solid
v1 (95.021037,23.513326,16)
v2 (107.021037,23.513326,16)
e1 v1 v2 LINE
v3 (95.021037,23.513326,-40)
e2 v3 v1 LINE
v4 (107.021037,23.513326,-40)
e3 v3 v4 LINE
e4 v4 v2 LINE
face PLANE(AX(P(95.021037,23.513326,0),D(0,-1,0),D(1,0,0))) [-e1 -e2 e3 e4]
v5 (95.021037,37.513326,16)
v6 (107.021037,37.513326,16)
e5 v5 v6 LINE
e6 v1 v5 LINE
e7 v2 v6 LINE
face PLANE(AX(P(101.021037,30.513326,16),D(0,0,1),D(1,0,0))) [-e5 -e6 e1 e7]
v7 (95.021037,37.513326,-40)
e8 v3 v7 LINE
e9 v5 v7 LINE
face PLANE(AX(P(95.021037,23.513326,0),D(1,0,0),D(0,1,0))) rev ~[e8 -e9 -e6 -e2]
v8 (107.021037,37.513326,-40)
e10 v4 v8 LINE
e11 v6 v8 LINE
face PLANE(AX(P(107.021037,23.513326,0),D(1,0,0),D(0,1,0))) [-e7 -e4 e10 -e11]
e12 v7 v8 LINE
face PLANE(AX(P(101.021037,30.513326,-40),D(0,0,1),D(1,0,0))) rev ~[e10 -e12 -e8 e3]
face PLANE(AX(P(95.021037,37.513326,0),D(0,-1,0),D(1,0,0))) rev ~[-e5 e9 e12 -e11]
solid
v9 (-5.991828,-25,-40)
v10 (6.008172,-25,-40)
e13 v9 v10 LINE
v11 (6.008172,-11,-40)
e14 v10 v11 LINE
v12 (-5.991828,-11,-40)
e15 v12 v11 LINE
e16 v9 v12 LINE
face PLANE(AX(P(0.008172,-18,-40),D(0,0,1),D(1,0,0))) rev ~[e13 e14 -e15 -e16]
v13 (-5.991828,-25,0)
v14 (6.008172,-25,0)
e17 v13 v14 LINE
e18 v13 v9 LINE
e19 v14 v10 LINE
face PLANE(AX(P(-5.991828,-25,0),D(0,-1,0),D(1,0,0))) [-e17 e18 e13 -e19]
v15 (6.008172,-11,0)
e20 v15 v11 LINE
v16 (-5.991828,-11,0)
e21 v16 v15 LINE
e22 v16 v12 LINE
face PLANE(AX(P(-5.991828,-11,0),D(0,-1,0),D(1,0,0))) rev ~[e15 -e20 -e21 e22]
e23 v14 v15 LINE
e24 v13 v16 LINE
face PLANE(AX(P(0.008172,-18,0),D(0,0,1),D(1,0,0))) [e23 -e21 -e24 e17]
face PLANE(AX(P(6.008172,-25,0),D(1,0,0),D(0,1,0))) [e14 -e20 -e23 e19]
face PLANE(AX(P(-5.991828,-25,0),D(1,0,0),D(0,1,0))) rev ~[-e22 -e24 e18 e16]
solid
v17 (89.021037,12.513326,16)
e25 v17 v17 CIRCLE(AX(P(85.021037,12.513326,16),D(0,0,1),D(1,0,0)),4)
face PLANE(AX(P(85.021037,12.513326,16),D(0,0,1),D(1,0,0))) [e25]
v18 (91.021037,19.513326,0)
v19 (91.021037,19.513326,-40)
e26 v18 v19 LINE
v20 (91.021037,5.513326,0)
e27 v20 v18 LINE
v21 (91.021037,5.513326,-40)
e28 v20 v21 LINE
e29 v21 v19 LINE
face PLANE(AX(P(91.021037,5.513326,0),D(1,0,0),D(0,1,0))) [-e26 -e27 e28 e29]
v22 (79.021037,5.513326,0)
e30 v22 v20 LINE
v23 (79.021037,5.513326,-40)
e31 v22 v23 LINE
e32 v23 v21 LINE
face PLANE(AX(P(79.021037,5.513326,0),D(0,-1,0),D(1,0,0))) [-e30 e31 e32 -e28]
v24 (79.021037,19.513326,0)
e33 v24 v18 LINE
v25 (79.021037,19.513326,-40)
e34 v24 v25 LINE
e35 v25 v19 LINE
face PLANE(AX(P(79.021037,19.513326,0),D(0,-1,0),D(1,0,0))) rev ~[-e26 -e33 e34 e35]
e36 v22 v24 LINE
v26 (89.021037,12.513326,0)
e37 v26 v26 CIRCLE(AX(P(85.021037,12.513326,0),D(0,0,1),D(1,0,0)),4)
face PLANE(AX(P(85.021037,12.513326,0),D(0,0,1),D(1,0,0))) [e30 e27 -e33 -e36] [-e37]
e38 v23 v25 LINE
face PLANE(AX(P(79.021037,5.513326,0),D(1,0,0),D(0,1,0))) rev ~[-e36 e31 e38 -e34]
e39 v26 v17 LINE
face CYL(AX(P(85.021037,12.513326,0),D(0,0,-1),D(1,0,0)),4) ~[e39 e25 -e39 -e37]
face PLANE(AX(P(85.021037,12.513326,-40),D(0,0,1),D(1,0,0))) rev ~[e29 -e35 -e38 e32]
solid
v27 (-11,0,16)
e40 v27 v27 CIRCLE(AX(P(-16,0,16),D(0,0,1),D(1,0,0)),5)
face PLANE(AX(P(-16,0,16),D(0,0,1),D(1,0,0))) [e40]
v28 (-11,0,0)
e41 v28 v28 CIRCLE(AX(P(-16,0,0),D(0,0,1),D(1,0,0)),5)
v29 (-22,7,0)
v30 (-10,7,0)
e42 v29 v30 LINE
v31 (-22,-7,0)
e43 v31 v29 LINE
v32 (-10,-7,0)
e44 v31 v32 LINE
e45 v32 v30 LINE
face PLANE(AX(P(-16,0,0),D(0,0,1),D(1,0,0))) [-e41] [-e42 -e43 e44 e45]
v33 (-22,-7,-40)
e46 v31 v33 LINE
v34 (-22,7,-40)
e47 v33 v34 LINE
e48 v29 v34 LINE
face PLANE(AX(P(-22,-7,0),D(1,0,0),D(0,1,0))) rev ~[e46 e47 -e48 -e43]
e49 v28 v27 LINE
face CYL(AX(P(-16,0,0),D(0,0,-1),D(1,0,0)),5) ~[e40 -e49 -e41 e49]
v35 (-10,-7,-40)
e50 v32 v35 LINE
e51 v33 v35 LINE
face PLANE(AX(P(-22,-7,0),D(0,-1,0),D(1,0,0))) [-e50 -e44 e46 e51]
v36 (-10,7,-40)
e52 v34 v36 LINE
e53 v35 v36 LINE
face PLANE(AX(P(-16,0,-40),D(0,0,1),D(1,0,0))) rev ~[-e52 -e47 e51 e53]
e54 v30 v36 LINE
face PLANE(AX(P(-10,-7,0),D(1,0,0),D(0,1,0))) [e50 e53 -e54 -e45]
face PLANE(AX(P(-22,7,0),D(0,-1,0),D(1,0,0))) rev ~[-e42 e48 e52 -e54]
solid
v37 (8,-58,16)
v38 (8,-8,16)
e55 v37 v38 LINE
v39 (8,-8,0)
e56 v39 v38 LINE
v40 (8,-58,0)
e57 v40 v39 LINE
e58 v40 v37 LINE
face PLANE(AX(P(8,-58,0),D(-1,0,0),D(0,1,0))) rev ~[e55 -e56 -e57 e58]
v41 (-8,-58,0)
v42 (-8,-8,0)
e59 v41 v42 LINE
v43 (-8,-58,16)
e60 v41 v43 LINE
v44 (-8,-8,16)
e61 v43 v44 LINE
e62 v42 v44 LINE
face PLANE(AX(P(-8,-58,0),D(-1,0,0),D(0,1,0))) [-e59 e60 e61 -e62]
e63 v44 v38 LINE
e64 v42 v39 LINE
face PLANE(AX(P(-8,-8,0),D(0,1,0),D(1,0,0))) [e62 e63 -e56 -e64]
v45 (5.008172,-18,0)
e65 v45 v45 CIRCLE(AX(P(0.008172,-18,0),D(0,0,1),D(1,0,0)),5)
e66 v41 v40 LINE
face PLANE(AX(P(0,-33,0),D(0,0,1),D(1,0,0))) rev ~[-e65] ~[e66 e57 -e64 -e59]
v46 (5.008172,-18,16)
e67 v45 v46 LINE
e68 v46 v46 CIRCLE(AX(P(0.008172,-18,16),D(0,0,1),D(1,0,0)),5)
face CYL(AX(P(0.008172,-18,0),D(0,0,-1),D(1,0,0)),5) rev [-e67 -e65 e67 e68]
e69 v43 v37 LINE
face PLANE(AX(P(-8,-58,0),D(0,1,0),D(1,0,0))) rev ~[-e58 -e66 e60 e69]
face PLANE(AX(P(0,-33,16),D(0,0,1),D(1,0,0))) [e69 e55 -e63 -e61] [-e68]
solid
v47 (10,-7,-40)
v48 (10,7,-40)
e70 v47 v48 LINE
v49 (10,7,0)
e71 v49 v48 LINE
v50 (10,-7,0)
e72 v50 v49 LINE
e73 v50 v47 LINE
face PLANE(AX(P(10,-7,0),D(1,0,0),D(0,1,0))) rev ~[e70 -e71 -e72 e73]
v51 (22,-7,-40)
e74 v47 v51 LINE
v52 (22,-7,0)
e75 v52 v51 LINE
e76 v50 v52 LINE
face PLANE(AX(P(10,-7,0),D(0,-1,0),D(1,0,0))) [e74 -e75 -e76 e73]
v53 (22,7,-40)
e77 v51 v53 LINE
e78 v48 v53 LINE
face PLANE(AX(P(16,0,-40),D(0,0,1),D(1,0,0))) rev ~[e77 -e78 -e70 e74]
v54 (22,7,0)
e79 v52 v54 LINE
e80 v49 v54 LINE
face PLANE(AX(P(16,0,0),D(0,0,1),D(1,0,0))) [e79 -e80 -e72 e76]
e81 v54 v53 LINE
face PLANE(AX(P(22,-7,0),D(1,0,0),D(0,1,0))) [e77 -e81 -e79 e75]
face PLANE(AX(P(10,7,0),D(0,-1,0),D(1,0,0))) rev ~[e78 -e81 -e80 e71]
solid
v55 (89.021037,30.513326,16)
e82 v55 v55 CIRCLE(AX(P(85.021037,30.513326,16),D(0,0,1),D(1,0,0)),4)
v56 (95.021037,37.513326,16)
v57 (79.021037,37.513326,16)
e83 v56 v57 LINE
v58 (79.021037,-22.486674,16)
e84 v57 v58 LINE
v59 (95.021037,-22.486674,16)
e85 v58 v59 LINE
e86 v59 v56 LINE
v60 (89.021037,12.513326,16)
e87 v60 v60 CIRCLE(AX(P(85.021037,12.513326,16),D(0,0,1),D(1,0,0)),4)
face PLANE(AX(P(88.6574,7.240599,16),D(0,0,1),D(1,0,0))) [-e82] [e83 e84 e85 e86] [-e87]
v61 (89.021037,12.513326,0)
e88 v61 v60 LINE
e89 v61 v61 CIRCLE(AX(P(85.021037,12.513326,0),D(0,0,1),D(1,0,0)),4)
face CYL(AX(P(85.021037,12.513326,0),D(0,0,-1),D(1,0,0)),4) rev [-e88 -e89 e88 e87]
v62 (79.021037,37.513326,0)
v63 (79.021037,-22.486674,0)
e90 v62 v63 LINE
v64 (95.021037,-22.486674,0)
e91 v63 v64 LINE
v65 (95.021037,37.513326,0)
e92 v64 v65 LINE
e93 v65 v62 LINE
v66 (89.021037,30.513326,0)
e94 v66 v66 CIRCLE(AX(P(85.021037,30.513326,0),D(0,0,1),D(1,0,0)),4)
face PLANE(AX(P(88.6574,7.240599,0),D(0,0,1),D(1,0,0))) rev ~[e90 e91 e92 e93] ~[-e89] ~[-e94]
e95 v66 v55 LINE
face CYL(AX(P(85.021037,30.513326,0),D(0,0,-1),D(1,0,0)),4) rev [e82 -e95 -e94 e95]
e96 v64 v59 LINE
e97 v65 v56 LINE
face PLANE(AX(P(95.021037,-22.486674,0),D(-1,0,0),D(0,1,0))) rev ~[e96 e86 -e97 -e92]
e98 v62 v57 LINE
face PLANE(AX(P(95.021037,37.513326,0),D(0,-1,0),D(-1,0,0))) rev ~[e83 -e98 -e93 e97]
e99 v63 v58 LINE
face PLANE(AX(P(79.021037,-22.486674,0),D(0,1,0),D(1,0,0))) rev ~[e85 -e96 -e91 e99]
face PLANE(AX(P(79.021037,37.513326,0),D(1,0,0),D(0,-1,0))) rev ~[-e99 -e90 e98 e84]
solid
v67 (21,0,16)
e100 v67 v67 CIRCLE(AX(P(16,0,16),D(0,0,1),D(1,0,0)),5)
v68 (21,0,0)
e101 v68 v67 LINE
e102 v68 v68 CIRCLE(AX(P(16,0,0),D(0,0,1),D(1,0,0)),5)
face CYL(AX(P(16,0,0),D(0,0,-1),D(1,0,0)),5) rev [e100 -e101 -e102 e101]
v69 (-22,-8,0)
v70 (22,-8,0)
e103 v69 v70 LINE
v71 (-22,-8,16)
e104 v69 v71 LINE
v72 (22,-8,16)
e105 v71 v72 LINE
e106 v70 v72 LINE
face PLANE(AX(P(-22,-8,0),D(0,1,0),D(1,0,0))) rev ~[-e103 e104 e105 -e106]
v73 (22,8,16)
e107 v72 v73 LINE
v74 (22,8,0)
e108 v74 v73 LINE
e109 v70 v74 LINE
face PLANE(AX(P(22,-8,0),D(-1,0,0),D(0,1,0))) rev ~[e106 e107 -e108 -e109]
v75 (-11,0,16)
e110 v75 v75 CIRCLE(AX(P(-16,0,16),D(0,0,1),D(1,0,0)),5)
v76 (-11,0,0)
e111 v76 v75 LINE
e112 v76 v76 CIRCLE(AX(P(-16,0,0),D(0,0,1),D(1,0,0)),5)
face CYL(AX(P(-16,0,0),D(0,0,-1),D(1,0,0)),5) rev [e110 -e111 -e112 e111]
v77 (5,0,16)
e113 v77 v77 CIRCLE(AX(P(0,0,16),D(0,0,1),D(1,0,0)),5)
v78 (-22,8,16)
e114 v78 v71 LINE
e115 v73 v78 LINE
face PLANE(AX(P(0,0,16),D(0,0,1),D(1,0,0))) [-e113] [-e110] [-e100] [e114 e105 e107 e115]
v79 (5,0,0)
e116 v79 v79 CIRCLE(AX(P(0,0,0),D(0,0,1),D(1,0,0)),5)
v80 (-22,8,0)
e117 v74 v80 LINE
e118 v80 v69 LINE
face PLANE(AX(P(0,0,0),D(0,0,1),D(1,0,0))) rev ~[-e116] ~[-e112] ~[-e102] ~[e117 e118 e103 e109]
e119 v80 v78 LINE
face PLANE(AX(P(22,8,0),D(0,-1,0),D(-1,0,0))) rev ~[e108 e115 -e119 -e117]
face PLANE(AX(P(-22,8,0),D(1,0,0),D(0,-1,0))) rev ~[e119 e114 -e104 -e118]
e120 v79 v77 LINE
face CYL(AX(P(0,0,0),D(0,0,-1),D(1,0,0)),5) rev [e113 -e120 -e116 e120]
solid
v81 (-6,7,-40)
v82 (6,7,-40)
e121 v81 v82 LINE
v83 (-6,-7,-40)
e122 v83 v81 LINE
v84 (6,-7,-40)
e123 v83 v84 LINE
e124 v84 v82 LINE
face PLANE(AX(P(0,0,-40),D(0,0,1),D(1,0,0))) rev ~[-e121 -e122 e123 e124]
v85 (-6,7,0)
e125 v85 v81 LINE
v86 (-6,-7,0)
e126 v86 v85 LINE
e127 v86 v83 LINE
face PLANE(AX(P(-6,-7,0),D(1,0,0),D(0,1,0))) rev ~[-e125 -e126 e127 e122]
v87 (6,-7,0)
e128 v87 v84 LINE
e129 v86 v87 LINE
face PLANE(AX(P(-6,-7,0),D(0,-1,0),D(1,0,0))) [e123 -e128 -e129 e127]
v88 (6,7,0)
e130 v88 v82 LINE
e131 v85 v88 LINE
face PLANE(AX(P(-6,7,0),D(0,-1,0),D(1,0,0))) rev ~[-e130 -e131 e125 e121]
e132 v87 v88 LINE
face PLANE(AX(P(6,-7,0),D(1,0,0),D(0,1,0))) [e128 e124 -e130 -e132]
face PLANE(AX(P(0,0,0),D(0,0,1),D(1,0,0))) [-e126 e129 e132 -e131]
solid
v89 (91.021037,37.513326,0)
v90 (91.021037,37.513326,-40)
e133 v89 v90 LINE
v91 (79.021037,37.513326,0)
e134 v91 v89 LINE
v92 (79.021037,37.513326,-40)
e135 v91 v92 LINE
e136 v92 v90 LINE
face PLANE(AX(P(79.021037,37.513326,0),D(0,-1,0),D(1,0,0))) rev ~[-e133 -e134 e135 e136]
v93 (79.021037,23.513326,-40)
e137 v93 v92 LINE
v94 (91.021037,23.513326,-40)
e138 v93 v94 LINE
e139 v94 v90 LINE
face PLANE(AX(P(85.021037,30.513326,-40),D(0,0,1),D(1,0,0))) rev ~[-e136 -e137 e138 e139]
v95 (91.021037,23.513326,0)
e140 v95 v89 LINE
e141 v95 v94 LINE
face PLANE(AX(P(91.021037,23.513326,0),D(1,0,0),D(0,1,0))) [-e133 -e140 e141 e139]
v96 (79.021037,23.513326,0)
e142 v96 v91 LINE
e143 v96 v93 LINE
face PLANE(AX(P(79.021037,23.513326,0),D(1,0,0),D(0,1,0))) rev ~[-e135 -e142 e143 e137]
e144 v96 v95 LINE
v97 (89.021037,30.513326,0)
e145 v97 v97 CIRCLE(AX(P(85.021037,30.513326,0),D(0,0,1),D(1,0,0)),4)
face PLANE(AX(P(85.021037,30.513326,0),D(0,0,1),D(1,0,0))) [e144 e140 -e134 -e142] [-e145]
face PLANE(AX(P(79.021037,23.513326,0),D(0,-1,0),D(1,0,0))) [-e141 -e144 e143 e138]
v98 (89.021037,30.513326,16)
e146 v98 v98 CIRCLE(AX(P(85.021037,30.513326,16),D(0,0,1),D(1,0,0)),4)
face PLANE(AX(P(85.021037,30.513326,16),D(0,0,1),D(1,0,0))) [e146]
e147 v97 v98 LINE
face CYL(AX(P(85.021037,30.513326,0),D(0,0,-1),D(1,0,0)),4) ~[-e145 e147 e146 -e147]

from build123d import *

# Parameters (mm, degrees)
F0_W      = 12
F0_H      = 14
F0_R      = 5
F1_DEPTH  = 16
F2_DEPTH  = 40
F0_W_2    = 16
F0_H_2    = 50
F3_DEPTH  = 16
F4_DEPTH  = 16
F0_R_2    = 4
F5_DEPTH  = 16
F6_DEPTH  = 16
F7_DEPTH  = 40
F8_DEPTH  = 40
F9_DEPTH  = 16
F10_DEPTH = 16
F11_DEPTH = 40


with BuildPart() as f1:
    # F0 (on Top) → F1 (new body)
    with BuildSketch(Plane.XY):
        Polygon((8, -8), (22, -8), (22, -7), (10, -7), (10, 7), (22, 7), (22, 8), (-22, 8), (-22, 7), (-10, 7), (-10, -7), (-22, -7), (-22, -8), (-8, -8), align=None)
        Rectangle(F0_W, F0_H, mode=Mode.SUBTRACT)
        with Locations((-16, 0)):
            Rectangle(F0_W, F0_H)
        with Locations((-16, 0)):
            Circle(F0_R, mode=Mode.SUBTRACT)
        Rectangle(F0_W, F0_H)
        Circle(F0_R, mode=Mode.SUBTRACT)
        with Locations((16, 0)):
            Rectangle(F0_W, F0_H)
        with Locations((16, 0)):
            Circle(F0_R, mode=Mode.SUBTRACT)
    extrude(amount=F1_DEPTH)


with BuildPart() as f2:
    # F0 (on Top) → F2 (new body)
    with BuildSketch(Plane.XY):
        with Locations((-16, 0)):
            Rectangle(F0_W, F0_H)
        with Locations((-16, 0)):
            Circle(F0_R, mode=Mode.SUBTRACT)
        with Locations((-16, 0)):
            Circle(F0_R)
    extrude(amount=-F2_DEPTH)

    # F0 (on Top) → F4 (join)
    with BuildSketch(Plane.XY):
        with Locations((-16, 0)):
            Circle(F0_R)
    extrude(amount=F4_DEPTH)


with BuildPart() as f2b:
    # F0 (on Top) → F2, piece 2 (new body)
    with BuildSketch(Plane.XY):
        Rectangle(F0_W, F0_H)
        Circle(F0_R, mode=Mode.SUBTRACT)
        Circle(F0_R)
    extrude(amount=-F2_DEPTH)


with BuildPart() as f2c:
    # F0 (on Top) → F2, piece 3 (new body)
    with BuildSketch(Plane.XY):
        with Locations((16, 0)):
            Rectangle(F0_W, F0_H)
        with Locations((16, 0)):
            Circle(F0_R, mode=Mode.SUBTRACT)
        with Locations((16, 0)):
            Circle(F0_R)
    extrude(amount=-F2_DEPTH)


with BuildPart() as f2d:
    # F0 (on Top) → F2, piece 4 (new body)
    with BuildSketch(Plane.XY):
        with Locations((0.0081723034, -18)):
            Rectangle(F0_W, F0_H)
        with Locations((0.0081723034, -18)):
            Circle(F0_R, mode=Mode.SUBTRACT)
        with Locations((0.0081723034, -18)):
            Circle(F0_R)
    extrude(amount=-F2_DEPTH)


with BuildPart() as f3:
    # F0 (on Top) → F3 (new body)
    with BuildSketch(Plane.XY):
        with Locations((0, -33)):
            Rectangle(F0_W_2, F0_H_2)
        with Locations((0.0081723034, -18)):
            Rectangle(F0_W, F0_H, mode=Mode.SUBTRACT)
        with Locations((0.0081723034, -18)):
            Rectangle(F0_W, F0_H)
        with Locations((0.0081723034, -18)):
            Circle(F0_R, mode=Mode.SUBTRACT)
    extrude(amount=F3_DEPTH)


with BuildPart() as f5:
    # F0 (on Top) → F5 (new body)
    with BuildSketch(Plane.XY):
        Polygon((79.0210366249, -22.486673668), (95.0210366249, -22.486673668), (95.0210366249, 23.513326332), (95.0210366249, 37.513326332), (91.0210366249, 37.513326332), (91.0210366249, 23.513326332), (79.0210366249, 23.513326332), (79.0210366249, 19.513326332), (91.0210366249, 19.513326332), (91.0210366249, 5.513326332), (79.0210366249, 5.513326332), align=None)
        with Locations((85.0210366249, 12.513326332)):
            Rectangle(F0_W, F0_H)
        with Locations((85.0210366249, 12.513326332)):
            Circle(F0_R_2, mode=Mode.SUBTRACT)
        with Locations((85.0210366249, 30.513326332)):
            Rectangle(F0_W, F0_H)
        with Locations((85.0210366249, 30.513326332)):
            Circle(F0_R_2, mode=Mode.SUBTRACT)
    extrude(amount=F5_DEPTH)


with BuildPart() as f6:
    # F0 (on Top) → F6 (new body)
    with BuildSketch(Plane.XY):
        with Locations((101.0210366249, 30.513326332)):
            Rectangle(F0_W, F0_H)
    extrude(amount=F6_DEPTH)

    # F0 (on Top) → F7 (join)
    with BuildSketch(Plane.XY):
        with Locations((101.0210366249, 30.513326332)):
            Rectangle(F0_W, F0_H)
    extrude(amount=-F7_DEPTH)


with BuildPart() as f8:
    # F0 (on Top) → F8 (new body)
    with BuildSketch(Plane.XY):
        with Locations((85.0210366249, 30.513326332)):
            Rectangle(F0_W, F0_H)
        with Locations((85.0210366249, 30.513326332)):
            Circle(F0_R_2, mode=Mode.SUBTRACT)
        with Locations((85.0210366249, 30.513326332)):
            Circle(F0_R_2)
    extrude(amount=-F8_DEPTH)

    # F0 (on Top) → F9 (join)
    with BuildSketch(Plane.XY):
        with Locations((85.0210366249, 30.513326332)):
            Circle(F0_R_2)
    extrude(amount=F9_DEPTH)


with BuildPart() as f10:
    # F0 (on Top) → F10 (new body)
    with BuildSketch(Plane.XY):
        with Locations((85.0210366249, 12.513326332)):
            Circle(F0_R_2)
    extrude(amount=F10_DEPTH)

    # F0 (on Top) → F11 (join)
    with BuildSketch(Plane.XY):
        with Locations((85.0210366249, 12.513326332)):
            Rectangle(F0_W, F0_H)
        with Locations((85.0210366249, 12.513326332)):
            Circle(F0_R_2, mode=Mode.SUBTRACT)
        with Locations((85.0210366249, 12.513326332)):
            Circle(F0_R_2)
    extrude(amount=-F11_DEPTH)


solid = Compound([f1.part, f2.part, f2b.part, f2c.part, f2d.part, f3.part, f5.part, f6.part, f8.part, f10.part])
